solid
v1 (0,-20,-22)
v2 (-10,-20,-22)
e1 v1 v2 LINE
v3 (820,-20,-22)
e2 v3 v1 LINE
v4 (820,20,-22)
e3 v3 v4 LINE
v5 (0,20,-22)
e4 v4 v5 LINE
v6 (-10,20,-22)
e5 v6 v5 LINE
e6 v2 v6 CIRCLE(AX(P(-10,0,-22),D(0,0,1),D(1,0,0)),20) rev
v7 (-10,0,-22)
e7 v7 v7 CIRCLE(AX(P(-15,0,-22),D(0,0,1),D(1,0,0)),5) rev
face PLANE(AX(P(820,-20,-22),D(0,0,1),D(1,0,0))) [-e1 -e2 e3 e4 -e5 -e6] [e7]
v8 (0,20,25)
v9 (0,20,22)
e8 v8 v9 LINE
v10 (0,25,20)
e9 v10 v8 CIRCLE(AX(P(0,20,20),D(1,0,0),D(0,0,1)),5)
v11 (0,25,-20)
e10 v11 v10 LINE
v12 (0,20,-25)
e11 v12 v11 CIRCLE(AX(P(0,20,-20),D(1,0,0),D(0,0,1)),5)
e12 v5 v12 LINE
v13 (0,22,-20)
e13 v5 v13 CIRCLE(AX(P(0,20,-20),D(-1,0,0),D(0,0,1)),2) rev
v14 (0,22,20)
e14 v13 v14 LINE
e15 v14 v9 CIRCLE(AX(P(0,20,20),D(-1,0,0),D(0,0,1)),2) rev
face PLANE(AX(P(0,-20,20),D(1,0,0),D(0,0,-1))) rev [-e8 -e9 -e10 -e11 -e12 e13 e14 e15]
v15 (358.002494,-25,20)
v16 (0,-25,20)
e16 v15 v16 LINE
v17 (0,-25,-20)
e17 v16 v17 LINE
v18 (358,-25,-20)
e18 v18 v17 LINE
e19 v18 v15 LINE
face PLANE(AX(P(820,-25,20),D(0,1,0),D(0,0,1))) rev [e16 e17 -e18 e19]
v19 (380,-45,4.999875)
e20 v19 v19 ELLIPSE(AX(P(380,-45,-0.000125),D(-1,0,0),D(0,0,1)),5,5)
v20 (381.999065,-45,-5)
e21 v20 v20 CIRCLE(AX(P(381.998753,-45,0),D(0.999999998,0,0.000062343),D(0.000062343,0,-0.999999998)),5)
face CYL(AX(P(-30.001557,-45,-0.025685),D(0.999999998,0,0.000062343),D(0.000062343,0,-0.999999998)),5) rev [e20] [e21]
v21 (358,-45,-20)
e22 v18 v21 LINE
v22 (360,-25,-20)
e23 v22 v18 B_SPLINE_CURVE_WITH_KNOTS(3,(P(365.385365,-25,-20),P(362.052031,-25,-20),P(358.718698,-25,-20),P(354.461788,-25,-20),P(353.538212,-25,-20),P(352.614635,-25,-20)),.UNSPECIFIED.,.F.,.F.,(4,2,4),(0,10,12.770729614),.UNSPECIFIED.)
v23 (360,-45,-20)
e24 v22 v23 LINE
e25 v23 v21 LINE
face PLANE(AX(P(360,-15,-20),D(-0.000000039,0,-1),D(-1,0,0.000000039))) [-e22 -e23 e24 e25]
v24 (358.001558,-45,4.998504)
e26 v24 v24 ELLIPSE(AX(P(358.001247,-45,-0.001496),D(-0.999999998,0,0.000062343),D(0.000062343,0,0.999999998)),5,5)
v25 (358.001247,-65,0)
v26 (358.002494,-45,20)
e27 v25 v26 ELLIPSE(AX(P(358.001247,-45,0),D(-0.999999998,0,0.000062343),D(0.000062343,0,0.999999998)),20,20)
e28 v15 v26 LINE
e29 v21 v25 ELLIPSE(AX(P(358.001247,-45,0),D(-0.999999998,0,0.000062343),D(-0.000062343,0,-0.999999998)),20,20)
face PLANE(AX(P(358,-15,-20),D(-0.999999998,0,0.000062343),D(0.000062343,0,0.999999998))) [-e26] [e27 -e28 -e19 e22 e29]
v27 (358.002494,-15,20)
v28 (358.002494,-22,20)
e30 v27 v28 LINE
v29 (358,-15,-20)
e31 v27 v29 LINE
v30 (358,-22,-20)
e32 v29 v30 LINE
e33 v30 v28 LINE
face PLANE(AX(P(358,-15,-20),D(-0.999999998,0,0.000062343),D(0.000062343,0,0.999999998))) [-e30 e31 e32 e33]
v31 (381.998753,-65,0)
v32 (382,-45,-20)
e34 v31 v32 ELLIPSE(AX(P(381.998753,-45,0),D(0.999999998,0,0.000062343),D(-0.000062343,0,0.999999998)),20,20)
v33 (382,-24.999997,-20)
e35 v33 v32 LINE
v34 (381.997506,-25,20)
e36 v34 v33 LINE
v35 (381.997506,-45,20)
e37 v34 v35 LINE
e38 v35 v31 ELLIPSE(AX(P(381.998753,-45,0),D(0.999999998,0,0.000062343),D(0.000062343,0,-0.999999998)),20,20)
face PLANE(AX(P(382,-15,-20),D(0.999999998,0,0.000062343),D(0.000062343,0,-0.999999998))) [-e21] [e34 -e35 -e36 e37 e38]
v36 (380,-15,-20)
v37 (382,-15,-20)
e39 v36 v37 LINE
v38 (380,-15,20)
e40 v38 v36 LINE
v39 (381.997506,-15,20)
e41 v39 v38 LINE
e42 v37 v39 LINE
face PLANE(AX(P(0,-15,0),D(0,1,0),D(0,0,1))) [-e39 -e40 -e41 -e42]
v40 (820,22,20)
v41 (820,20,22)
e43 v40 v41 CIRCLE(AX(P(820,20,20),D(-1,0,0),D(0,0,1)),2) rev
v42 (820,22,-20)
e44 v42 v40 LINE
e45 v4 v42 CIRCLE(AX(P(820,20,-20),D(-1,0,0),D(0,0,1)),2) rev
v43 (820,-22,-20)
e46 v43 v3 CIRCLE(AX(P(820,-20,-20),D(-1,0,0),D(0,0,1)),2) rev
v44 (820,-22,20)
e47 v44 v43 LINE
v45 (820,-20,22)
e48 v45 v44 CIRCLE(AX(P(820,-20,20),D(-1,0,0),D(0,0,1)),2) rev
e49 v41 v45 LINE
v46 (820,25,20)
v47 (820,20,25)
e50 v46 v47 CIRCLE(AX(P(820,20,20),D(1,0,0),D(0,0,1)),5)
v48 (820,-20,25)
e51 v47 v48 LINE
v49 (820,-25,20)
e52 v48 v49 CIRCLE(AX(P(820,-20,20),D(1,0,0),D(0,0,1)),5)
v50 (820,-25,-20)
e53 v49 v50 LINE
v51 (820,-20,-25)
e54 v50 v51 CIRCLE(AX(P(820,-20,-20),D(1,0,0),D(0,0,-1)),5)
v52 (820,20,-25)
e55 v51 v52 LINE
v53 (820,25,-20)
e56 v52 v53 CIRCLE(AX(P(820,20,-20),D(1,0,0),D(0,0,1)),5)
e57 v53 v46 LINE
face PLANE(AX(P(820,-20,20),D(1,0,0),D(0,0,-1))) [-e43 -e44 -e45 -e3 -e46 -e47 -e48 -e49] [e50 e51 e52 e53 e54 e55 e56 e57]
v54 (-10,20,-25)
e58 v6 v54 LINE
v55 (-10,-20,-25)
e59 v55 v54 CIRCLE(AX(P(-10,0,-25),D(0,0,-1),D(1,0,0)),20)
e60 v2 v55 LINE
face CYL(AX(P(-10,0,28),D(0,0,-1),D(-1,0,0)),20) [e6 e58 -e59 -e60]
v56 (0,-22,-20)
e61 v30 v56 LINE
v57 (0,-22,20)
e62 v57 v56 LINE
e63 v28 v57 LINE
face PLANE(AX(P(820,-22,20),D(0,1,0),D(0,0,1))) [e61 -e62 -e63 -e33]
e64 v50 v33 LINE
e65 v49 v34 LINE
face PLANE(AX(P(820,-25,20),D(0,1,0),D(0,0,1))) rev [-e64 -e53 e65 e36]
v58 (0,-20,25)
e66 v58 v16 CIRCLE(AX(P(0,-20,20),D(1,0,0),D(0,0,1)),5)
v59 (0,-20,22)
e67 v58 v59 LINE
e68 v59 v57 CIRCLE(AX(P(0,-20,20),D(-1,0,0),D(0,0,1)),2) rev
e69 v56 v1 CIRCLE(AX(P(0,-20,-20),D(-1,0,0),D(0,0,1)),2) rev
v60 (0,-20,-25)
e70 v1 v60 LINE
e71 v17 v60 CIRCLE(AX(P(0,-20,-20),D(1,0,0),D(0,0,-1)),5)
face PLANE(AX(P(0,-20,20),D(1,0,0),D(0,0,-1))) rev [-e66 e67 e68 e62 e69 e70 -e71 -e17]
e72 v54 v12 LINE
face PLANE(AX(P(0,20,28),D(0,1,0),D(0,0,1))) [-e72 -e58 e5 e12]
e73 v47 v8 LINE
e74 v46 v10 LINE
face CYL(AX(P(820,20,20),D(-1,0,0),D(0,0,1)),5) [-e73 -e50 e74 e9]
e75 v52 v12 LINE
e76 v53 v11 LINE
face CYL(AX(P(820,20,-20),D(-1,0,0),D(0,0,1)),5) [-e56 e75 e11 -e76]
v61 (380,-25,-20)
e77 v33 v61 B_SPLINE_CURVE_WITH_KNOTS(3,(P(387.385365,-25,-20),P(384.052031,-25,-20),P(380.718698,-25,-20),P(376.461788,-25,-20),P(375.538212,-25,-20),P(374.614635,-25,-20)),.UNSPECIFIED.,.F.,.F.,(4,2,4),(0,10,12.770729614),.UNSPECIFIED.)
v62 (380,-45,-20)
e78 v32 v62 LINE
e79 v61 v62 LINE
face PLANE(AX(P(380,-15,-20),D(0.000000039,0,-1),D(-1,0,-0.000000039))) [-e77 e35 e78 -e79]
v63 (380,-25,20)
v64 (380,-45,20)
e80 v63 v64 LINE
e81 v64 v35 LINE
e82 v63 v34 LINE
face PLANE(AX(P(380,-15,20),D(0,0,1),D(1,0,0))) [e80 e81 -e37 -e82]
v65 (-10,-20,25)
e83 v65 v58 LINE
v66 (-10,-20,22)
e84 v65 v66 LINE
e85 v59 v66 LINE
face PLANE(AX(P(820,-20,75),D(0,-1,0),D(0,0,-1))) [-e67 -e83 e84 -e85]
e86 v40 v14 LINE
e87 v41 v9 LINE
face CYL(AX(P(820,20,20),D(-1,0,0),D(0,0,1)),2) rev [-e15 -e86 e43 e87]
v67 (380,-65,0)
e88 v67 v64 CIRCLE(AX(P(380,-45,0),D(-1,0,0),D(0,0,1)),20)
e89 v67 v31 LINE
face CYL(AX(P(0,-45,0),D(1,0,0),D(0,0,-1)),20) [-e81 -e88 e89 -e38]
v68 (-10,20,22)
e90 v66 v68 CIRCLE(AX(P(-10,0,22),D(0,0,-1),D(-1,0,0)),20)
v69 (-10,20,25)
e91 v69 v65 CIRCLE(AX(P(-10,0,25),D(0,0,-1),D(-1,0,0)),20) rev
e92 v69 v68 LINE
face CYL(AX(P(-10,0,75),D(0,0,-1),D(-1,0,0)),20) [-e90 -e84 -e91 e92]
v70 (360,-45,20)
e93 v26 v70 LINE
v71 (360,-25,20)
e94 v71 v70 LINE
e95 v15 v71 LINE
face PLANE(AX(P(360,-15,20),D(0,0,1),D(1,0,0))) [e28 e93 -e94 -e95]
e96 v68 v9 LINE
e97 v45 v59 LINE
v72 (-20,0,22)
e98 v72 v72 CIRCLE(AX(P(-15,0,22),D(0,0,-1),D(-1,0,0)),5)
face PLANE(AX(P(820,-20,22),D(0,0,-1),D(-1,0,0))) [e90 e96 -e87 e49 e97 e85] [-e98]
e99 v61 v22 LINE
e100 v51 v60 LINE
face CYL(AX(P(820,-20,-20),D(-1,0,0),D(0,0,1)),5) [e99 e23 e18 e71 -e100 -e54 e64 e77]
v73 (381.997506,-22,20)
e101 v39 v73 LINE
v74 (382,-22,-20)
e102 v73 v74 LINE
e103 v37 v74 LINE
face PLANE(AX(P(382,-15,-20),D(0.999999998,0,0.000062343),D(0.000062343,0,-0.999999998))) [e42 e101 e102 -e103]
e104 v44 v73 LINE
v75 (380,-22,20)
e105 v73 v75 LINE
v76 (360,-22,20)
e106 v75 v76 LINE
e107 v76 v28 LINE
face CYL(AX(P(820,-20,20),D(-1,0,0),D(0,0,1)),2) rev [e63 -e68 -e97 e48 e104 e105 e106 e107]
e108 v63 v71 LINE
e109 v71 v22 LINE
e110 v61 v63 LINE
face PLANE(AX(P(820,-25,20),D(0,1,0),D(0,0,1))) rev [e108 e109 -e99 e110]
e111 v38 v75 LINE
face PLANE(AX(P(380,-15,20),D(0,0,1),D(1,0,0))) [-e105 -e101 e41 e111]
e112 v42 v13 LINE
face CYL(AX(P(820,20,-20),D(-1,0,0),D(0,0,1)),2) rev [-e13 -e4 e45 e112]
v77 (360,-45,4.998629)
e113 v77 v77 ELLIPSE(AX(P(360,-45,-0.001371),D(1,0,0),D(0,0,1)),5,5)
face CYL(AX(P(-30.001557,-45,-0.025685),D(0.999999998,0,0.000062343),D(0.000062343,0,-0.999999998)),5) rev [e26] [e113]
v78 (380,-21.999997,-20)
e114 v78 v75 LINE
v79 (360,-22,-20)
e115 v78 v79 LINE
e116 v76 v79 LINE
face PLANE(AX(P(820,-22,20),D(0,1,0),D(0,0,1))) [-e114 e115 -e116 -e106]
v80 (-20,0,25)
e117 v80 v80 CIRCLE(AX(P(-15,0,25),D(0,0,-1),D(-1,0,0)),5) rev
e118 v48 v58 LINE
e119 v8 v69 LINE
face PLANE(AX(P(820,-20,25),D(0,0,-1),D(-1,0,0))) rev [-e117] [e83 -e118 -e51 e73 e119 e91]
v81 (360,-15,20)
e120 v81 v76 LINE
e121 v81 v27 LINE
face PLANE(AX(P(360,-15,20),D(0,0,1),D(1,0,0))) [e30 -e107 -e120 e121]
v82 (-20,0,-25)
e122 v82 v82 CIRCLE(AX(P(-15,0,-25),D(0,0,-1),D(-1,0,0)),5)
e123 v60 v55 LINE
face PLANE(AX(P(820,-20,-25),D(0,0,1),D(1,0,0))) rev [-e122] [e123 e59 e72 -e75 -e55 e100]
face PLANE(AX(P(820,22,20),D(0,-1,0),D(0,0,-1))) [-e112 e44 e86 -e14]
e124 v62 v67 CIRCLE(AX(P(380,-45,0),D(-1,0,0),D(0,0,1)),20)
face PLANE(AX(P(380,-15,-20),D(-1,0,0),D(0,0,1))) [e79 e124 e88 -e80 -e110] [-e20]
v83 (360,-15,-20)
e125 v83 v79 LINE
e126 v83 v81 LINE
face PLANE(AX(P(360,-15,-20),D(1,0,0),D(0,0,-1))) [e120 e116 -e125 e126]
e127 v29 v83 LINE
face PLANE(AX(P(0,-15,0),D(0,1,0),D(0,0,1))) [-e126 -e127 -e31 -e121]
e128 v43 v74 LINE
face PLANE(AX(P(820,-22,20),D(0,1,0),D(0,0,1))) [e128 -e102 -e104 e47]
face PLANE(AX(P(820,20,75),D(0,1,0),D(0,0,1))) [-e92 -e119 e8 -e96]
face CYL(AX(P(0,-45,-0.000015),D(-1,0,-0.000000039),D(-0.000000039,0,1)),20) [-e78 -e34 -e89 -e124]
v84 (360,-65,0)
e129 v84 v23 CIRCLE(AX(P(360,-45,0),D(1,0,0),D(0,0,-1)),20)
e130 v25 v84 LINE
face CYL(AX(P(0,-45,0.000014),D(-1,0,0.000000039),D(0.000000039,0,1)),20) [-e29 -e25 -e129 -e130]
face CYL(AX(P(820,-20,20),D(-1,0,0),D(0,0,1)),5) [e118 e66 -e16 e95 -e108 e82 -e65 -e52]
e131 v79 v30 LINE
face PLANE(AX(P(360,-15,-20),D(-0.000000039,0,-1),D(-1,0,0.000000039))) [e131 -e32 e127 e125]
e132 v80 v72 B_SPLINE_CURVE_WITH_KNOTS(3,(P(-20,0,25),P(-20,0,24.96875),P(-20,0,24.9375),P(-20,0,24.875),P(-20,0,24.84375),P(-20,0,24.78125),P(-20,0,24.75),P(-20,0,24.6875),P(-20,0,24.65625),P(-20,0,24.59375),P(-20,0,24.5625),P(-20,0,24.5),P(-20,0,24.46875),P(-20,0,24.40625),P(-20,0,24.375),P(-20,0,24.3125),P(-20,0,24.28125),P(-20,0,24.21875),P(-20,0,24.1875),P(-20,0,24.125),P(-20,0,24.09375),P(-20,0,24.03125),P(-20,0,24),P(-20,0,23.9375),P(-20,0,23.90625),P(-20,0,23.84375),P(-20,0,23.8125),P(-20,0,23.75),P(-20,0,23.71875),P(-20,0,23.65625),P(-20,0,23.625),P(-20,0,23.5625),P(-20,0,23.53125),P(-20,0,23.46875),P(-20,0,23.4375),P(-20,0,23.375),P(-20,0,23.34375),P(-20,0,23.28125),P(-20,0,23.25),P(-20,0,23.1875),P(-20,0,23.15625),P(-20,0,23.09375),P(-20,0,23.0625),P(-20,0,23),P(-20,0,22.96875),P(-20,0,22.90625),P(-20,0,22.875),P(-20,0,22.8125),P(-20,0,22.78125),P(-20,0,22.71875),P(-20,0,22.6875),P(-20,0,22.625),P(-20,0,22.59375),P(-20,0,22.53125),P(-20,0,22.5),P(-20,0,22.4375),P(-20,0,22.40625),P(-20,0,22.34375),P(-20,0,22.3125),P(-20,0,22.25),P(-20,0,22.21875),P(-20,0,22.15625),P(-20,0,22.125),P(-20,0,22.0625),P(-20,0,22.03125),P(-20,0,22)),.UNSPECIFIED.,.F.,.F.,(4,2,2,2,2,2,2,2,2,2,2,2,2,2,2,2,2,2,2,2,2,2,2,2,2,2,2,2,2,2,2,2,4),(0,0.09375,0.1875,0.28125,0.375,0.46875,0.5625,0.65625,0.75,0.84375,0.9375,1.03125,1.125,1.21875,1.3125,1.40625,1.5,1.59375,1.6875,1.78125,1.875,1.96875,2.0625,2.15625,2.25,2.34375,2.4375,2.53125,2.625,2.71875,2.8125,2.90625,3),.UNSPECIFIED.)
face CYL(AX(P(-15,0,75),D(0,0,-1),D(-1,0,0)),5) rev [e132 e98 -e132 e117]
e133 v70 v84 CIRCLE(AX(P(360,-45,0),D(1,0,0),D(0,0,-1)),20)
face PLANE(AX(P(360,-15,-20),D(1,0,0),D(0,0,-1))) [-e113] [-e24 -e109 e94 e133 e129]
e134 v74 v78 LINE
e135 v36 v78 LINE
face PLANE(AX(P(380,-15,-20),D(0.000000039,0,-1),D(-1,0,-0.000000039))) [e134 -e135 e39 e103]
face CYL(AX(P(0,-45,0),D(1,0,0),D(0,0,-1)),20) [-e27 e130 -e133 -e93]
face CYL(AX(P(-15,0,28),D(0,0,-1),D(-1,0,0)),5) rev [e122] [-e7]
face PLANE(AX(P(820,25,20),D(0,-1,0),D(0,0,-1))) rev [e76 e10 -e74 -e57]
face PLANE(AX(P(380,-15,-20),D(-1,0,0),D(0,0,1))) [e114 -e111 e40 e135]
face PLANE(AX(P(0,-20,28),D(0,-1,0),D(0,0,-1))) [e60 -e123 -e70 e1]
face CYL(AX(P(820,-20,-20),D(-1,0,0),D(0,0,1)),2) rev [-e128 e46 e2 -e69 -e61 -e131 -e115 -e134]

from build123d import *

# Parameters (mm, degrees)
EXTRUDE_THIN1_DEPTH      = 820
SKETCH3_R                = 5
BOSS_EXTRUDE2_DEPTH      = 3
BOSS_EXTRUDE3_START      = -47
SKETCH3_3_R              = 5
BOSS_EXTRUDE3_DEPTH      = 3
BOSS_EXTRUDE4_DEPTH      = 40
BOSS_EXTRUDE4_DEPTH_BACK = 10
FILLET1_R                = 20
SKETCH7_R                = 5
CUT_EXTRUDE3_DEPTH       = 444.504548848


with BuildPart() as part:
    # Sketch1 → Extrude-Thin1 (new body)
    with BuildSketch(Plane(origin=(0, 0, 0), x_dir=(0, 0, -1), z_dir=(1, 0, 0))):
        with BuildLine():
            Line((-25, 20), (-25, -20))
            ThreePointArc((-25, -20), (-23.535533906, -23.535533906), (-20, -25))
            Line((-20, -25), (20, -25))
            ThreePointArc((20, -25), (23.535533906, -23.535533906), (25, -20))
            Line((25, -20), (25, 20))
            ThreePointArc((25, 20), (23.535533906, 23.535533906), (20, 25))
            Line((20, 25), (-20, 25))
            ThreePointArc((-20, 25), (-23.535533906, 23.535533906), (-25, 20))
        make_face()
        with BuildLine():
            Line((-22, 20), (-22, -20))
            ThreePointArc((-22, -20), (-21.414213562, -21.414213562), (-20, -22))
            Line((-20, -22), (20, -22))
            ThreePointArc((20, -22), (21.414213562, -21.414213562), (22, -20))
            Line((22, -20), (22, 20))
            ThreePointArc((22, 20), (21.414213562, 21.414213562), (20, 22))
            Line((20, 22), (-20, 22))
            ThreePointArc((-20, 22), (-21.414213562, 21.414213562), (-22, 20))
        make_face(mode=Mode.SUBTRACT)
    extrude(amount=EXTRUDE_THIN1_DEPTH)

    # Sketch3 → Boss-Extrude2 (add)
    with BuildSketch(Plane(origin=(0, 0, -25), x_dir=(-1, 0, 0), z_dir=(0, 0, -1))):
        with BuildLine():
            Line((0, 20), (10, 20))
            ThreePointArc((10, 20), (30, 0), (10, -20))
            Line((10, -20), (0, -20))
            Line((0, -20), (0, 20))
        make_face()
        with Locations((15, 0)):
            Circle(SKETCH3_R, mode=Mode.SUBTRACT)
    extrude(amount=-BOSS_EXTRUDE2_DEPTH)

    # Sketch3<3> → Boss-Extrude3 (add)
    with BuildSketch(Plane(origin=(0, 0, -25), x_dir=(-1, 0, 0), z_dir=(0, 0, -1)).offset(BOSS_EXTRUDE3_START)):
        with BuildLine():
            Line((0, 20), (10, 20))
            ThreePointArc((10, 20), (30, 0), (10, -20))
            Line((10, -20), (0, -20))
            Line((0, -20), (0, 20))
        make_face()
        with Locations((15, 0)):
            Circle(SKETCH3_3_R, mode=Mode.SUBTRACT)
    extrude(amount=-BOSS_EXTRUDE3_DEPTH)

    # Sketch5 → Boss-Extrude4 (add, two sides: drawn at the far end of the back side and taken through both)
    with BuildSketch(Plane.XZ.offset(25).offset(-BOSS_EXTRUDE4_DEPTH_BACK)):
        Polygon((358, -19.999999922), (358.002493701, 20), (360, 20), (360, -20), align=None)
        Polygon((380, 20), (381.997506299, 20), (382, -19.999999922), (380, -20), align=None)
    extrude(amount=BOSS_EXTRUDE4_DEPTH + BOSS_EXTRUDE4_DEPTH_BACK)

    # Fillet1
    fillet1_edges = [part.edges().sort_by_distance(p)[0] for p in [
        (380.99875315, -65, 20),
        (381, -65, -19.999999961),
        (359.00124685, -65, 20),
        (359, -65, -19.999999961),
    ]]
    fillet(fillet1_edges, radius=FILLET1_R - 0.0001)  # a hair under: the kernel refuses the full size

    # Sketch7 → Cut-Extrude3 (cut, through all)
    with BuildSketch(Plane(origin=(381.998751665, 0, 0.023814765), x_dir=(6.234251963554982e-05, 0, -0.9999999980567051), z_dir=(0.9999999980567051, 0, 6.234251963554982e-05))):
        with Locations((0.023814765, -45)):
            Circle(SKETCH7_R)
    extrude(amount=-CUT_EXTRUDE3_DEPTH, mode=Mode.SUBTRACT)


solid = part.part
